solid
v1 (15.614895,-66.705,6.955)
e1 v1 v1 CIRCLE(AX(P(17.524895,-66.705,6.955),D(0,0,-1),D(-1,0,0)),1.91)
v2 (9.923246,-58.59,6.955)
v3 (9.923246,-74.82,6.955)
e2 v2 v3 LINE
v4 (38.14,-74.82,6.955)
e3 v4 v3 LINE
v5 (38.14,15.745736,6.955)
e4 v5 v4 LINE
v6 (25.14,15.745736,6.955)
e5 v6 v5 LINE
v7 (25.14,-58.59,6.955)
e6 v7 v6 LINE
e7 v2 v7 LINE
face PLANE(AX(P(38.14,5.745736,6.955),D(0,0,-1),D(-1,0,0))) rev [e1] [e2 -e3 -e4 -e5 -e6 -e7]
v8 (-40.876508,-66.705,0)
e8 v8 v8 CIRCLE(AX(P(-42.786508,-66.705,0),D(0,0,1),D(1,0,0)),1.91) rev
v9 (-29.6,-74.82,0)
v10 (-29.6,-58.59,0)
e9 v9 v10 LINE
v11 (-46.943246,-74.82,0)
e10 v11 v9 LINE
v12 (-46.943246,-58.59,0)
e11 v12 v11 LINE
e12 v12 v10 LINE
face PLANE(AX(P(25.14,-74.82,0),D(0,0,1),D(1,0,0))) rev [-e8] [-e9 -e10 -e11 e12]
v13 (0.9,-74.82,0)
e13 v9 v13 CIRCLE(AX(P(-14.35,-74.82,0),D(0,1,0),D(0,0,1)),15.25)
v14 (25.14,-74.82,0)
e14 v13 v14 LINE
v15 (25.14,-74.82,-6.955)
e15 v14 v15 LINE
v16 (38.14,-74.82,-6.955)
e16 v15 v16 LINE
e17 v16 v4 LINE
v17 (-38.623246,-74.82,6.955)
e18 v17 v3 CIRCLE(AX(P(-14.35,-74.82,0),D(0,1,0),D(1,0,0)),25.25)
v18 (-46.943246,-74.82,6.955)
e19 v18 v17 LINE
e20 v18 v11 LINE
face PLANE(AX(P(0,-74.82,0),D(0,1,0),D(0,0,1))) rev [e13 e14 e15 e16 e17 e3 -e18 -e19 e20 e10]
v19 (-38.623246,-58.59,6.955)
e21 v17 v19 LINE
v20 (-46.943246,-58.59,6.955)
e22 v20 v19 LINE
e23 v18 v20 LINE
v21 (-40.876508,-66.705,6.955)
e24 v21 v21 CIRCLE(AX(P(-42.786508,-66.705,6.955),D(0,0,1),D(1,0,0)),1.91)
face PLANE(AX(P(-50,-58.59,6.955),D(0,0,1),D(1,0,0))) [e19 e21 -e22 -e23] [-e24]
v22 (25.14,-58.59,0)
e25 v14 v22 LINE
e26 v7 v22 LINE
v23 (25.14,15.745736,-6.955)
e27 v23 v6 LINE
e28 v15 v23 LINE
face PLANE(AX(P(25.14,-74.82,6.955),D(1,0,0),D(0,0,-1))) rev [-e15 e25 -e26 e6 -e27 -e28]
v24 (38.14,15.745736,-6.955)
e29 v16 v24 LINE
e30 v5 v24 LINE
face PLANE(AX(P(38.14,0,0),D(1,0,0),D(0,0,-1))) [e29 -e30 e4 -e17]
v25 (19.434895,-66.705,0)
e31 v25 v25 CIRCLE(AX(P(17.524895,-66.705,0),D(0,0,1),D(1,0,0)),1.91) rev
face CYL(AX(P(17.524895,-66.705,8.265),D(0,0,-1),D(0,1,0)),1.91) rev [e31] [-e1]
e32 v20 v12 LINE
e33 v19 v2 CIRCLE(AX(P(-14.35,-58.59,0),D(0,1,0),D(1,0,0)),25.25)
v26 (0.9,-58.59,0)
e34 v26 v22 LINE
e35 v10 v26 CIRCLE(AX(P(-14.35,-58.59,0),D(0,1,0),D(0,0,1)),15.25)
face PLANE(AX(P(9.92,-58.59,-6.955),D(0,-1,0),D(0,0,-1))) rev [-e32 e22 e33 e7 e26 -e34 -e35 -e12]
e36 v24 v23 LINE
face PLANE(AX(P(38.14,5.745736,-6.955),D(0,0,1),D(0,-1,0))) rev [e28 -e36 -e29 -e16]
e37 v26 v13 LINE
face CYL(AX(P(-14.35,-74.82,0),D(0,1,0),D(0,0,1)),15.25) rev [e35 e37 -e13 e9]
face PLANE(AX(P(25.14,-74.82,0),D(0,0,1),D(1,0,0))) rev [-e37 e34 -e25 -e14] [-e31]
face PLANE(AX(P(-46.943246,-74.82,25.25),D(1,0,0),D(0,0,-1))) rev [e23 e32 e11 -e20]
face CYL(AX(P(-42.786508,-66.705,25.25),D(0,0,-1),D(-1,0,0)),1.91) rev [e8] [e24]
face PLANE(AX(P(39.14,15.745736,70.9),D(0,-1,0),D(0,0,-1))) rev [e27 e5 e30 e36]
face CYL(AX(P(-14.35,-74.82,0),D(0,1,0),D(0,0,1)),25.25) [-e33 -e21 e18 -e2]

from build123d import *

# Parameters (mm, degrees)
SKETCH_1_W                = 50.28
SKETCH_1_H                = 34.2
SKETCH_1_W_2              = 30.28
SKETCH_1_H_2              = 14.2
EXTRUDE_1_DEPTH           = 12.25
SKETCH_4_W                = 13
SKETCH_4_H                = 13.91
EXTRUDE_1_2_DEPTH         = 74.82
SKETCH_5_W                = 13.91
SKETCH_5_H                = 16.23
EXTRUDE_2_DEPTH           = 16
SKETCH_7_R                = 25.25
SKETCH_7_R_2              = 15.25
EXTRUDE_2_2_DEPTH         = 16.23
SKETCH_15_R               = 1.91
CUT_EXTRUDE_6_DEPTH       = 97.964478439
SKETCH_18_W               = 49.344544624
SKETCH_18_H               = 6.125
CUT_EXTRUDE_8_DEPTH       = 101.789238284
SKETCH_19_W               = 34.2
SKETCH_19_H               = 6.125
CUT_EXTRUDE_9_DEPTH       = 10
SKETCH_21_R               = 1.91
CUT_EXTRUDE_10_DEPTH      = 10
SKETCH_20_R               = 1.91
CUT_EXTRUDE_11_DEPTH      = 10
FILLET_START              = -7.1
FILLET_1_DEPTH            = 14.2
FILLET_2_DEPTH            = 14.2
SKETCH_29_W               = 13.91
SKETCH_29_H               = 74.82
EXTRUDE_5_DEPTH           = 10
SKETCH_30_W               = 10
SKETCH_30_H               = 58.59
CUT_EXTRUDE_13_DEPTH      = 97.964478439
SKETCH_32_W               = 34.2
SKETCH_32_H               = 5.745736365
EXTRUDE_6_DEPTH           = 10
CUT_EXTRUDE_16_DEPTH      = 50
CUT_EXTRUDE_16_DEPTH_BACK = 50
SKETCH_38_W               = 116.985630298
SKETCH_38_H               = 80.538350638
SKETCH_41_W               = 13.91
SKETCH_41_H               = 5.745736365
EXTRUDE_7_DEPTH           = 3
SKETCH_42_W               = 13
SKETCH_42_H               = 13.91
EXTRUDE_8_DEPTH           = 74.82
SKETCH_43_W               = 13.91
SKETCH_43_H               = 16.23
EXTRUDE_9_DEPTH           = 15.22
SKETCH_44_R               = 1.91
CUT_EXTRUDE_17_DEPTH      = 15.22
SKETCH_46_R               = 25.25
SKETCH_46_R_2             = 15.25
EXTRUDE_6_2_DEPTH         = 16.23
EXTRUDE_10_DEPTH          = 7.22
EXTRUDE_10_DEPTH_BACK     = 10
SKETCH_47_W               = 13.91
SKETCH_47_H               = 16.23
SKETCH_50_W               = 3.056753925
SKETCH_50_H               = 16.23
CUT_EXTRUDE_18_DEPTH      = 96.578211037
SKETCH_51_R               = 1.91
CUT_EXTRUDE_19_DEPTH      = 95.015226304
SKETCH_52_W               = 92.841945613
SKETCH_52_H               = 30
CUT_EXTRUDE_20_DEPTH      = 84.840694713
CUT_EXTRUDE_22_DEPTH      = 50
CUT_EXTRUDE_22_DEPTH_BACK = 50
SKETCH_53_W               = 63.541345486
SKETCH_53_H               = 14.170740414
SKETCH_54_W               = 10
SKETCH_54_H               = 10.145
CUT_EXTRUDE_23_DEPTH      = 50
SKETCH_55_W               = 13
SKETCH_55_H               = 13.91
EXTRUDE_11_DEPTH          = 10
SKETCH_57_W               = 15
SKETCH_57_H               = 34.2
EXTRUDE_12_DEPTH          = 10
SKETCH_58_W               = 34.2
SKETCH_58_H               = 10
EXTRUDE_13_DEPTH          = 27.85
SKETCH_60_W               = 34.2
SKETCH_60_H               = 10
EXTRUDE_14_DEPTH          = 50.28
SKETCH_62_W               = 30.28
SKETCH_62_H               = 14.2
CUT_EXTRUDE_24_DEPTH      = 50.28
SKETCH_64_R               = 1.91
CUT_EXTRUDE_25_DEPTH      = 10
FILLET_3_R                = 30
SKETCH_71_W               = 129.242048602
SKETCH_71_H               = 16.62743132
CUT_EXTRUDE_26_DEPTH      = 88


with BuildPart() as part:
    # 草圖1 → Extrude 1 (new body)
    with BuildSketch(Plane(origin=(0, 0, 0), x_dir=(1, 0, 0), z_dir=(0, 1, 0))):
        Rectangle(SKETCH_1_W, SKETCH_1_H)
        Rectangle(SKETCH_1_W_2, SKETCH_1_H_2, mode=Mode.SUBTRACT)
    extrude(amount=EXTRUDE_1_DEPTH)

    # 草圖4 → Extrude 1 2 (add)
    with BuildSketch(Plane.XZ):
        with Locations((18.64, 0)):
            Rectangle(SKETCH_4_W, SKETCH_4_H)
    extrude(amount=EXTRUDE_1_2_DEPTH)

    # 草圖5 → Extrude 2 (add)
    with BuildSketch(Plane.ZY.offset(-12.14)):
        with Locations((0, -66.705)):
            Rectangle(SKETCH_5_W, SKETCH_5_H)
    extrude(amount=EXTRUDE_2_DEPTH)

    # 草圖7 → Extrude 2 2 (add)
    with BuildSketch(Plane(origin=(3.626674765, -74.82, 0), x_dir=(1, 0, 0), z_dir=(0, -1, 0))):
        with Locations((-30.978154344, 0)):
            Circle(SKETCH_7_R)
        with Locations((-30.978154344, 0)):
            Circle(SKETCH_7_R_2, mode=Mode.SUBTRACT)
    extrude(amount=-EXTRUDE_2_2_DEPTH)

    # 草圖15 → 除料-伸長6 (cut, through all)
    with BuildSketch(Plane(origin=(0, 0, -6.955), x_dir=(-1, 0, 0), z_dir=(0, 0, -1))):
        with Locations((-4.530883248, -66.705)):
            Circle(SKETCH_15_R)
    extrude(amount=-CUT_EXTRUDE_6_DEPTH, mode=Mode.SUBTRACT)

    # 草圖18 → 除料-伸長8 (cut, through all)
    with BuildSketch(Plane(origin=(0, 0, -17.1), x_dir=(-1, 0, 0), z_dir=(0, 0, -1))):
        with Locations((0.467727688, 9.1875)):
            Rectangle(SKETCH_18_W, SKETCH_18_H)
    extrude(amount=-CUT_EXTRUDE_8_DEPTH, mode=Mode.SUBTRACT)

    # 草圖19 → 除料-伸長9 (cut)
    with BuildSketch(Plane.ZY.offset(-24.204544624)):
        with Locations((0, 9.1875)):
            Rectangle(SKETCH_19_W, SKETCH_19_H)
    extrude(amount=-CUT_EXTRUDE_9_DEPTH, mode=Mode.SUBTRACT)

    # 草圖21 → 除料-伸長10 (cut)
    with BuildSketch(Plane(origin=(0, 6.125, 0), x_dir=(1, 0, 0), z_dir=(0, 1, 0))):
        with Locations(Location((17.69, 0, 0), (0, 0, 270))):
            Circle(SKETCH_21_R)
    extrude(amount=-CUT_EXTRUDE_10_DEPTH, mode=Mode.SUBTRACT)

    # 草圖20 → 除料-伸長11 (cut)
    with BuildSketch(Plane(origin=(0, 6.125, 0), x_dir=(1, 0, 0), z_dir=(0, 1, 0))):
        with Locations(Location((-17.395, 0, 0), (0, 0, 270))):
            Circle(SKETCH_20_R)
    extrude(amount=-CUT_EXTRUDE_11_DEPTH, mode=Mode.SUBTRACT)

    # 圓角1: read off the stored shape, not the designer's step
    # 圓角1 outline → 圓角1 (cut)
    with BuildSketch(Plane.XY.offset(FILLET_START)):
        with BuildLine():
            add(Edge.make_bspline(
                [(-15.14, 0), (-21.974170252, 5.199829476), (-25.14, 5.745736365)],
                knots=[0, 0, 0, 0.664102345, 0.664102345, 0.664102345], degree=2, weights=[1, 2.223777218, 1.822127795]))
            Line((-15.14, 0), (-15.14, 6.125))
            Line((-15.14, 6.125), (-25.14, 6.125))
            Line((-25.14, 6.125), (-25.14, 5.745736365))
        make_face()
    extrude(amount=FILLET_1_DEPTH, mode=Mode.SUBTRACT)

    # 圓角2: read off the stored shape, not the designer's step
    # 圓角2 outline → 圓角2 (cut)
    with BuildSketch(Plane.XY.offset(FILLET_START)):
        with BuildLine():
            Line((15.14, 6.125), (15.14, 0))
            add(Edge.make_bspline(
                [(15.14, 0), (21.974170252, 5.199829476), (25.14, 5.745736365)],
                knots=[0, 0, 0, 0.664102345, 0.664102345, 0.664102345], degree=2, weights=[1, 2.223777218, 1.822127795]))
            Line((25.14, 5.745736365), (25.14, 6.125))
            Line((25.14, 6.125), (15.14, 6.125))
        make_face()
    extrude(amount=FILLET_2_DEPTH, mode=Mode.SUBTRACT)

    # 草圖29 → 填料-伸長5 (add)
    with BuildSketch(Plane(origin=(25.14, 0, 0), x_dir=(0, 0, -1), z_dir=(1, 0, 0))):
        with Locations((0, -37.41)):
            Rectangle(SKETCH_29_W, SKETCH_29_H)
    extrude(amount=EXTRUDE_5_DEPTH)

    # 草圖30 → 除料-伸長13 (cut, through all)
    with BuildSketch(Plane.XY.offset(6.955)):
        with Locations((17.14, -29.295)):
            Rectangle(SKETCH_30_W, SKETCH_30_H)
    extrude(amount=-CUT_EXTRUDE_13_DEPTH, mode=Mode.SUBTRACT)

    # 草圖32 → Extrude 6 (add)
    with BuildSketch(Plane(origin=(25.14, 0, 0), x_dir=(0, 0, -1), z_dir=(1, 0, 0))):
        with Locations((0, 2.872868182)):
            Rectangle(SKETCH_32_W, SKETCH_32_H)
    extrude(amount=EXTRUDE_6_DEPTH)

    # 草圖38 → 除料-伸長16 (cut, two sides: drawn at the far end of the back side and taken through both)
    with BuildSketch(Plane(origin=(0, 0, -6.955), x_dir=(-1, 0, 0), z_dir=(0, 0, -1)).offset(-CUT_EXTRUDE_16_DEPTH_BACK)):
        with Locations((7.268869252, -40.269175319)):
            Rectangle(SKETCH_38_W, SKETCH_38_H)
    extrude(amount=CUT_EXTRUDE_16_DEPTH + CUT_EXTRUDE_16_DEPTH_BACK, mode=Mode.SUBTRACT)

    # 草圖41 → 填料-伸長7 (add)
    with BuildSketch(Plane(origin=(35.14, 0, 0), x_dir=(0, 0, -1), z_dir=(1, 0, 0))):
        with Locations((0, 2.872868182)):
            Rectangle(SKETCH_41_W, SKETCH_41_H)
    extrude(amount=EXTRUDE_7_DEPTH)

    # 草圖42 → 填料-伸長8 (add)
    with BuildSketch(Plane(origin=(0, 0, 0), x_dir=(-1, 0, 0), z_dir=(0, -1, 0))):
        with Locations((-31.64, 0)):
            Rectangle(SKETCH_42_W, SKETCH_42_H)
    extrude(amount=EXTRUDE_8_DEPTH)

    # 草圖43 → 填料-伸長9 (add)
    with BuildSketch(Plane.ZY.offset(-25.14)):
        with Locations((0, -66.705)):
            Rectangle(SKETCH_43_W, SKETCH_43_H)
    extrude(amount=EXTRUDE_9_DEPTH)

    # 草圖44 → 除料-伸長17 (cut)
    with BuildSketch(Plane(origin=(0, 0, -6.955), x_dir=(-1, 0, 0), z_dir=(0, 0, -1))):
        with Locations(Location((-17.524895264, -66.705, 0), (0, 0, 90))):
            Circle(SKETCH_44_R)
    extrude(amount=-CUT_EXTRUDE_17_DEPTH, mode=Mode.SUBTRACT)

    # 草圖46 → Extrude 6 2 (add)
    with BuildSketch(Plane(origin=(0, -58.59, 0), x_dir=(1, 0, 0), z_dir=(0, 1, 0))):
        with Locations((-14.35, 0)):
            Circle(SKETCH_46_R)
        with Locations((-14.35, 0)):
            Circle(SKETCH_46_R_2, mode=Mode.SUBTRACT)
    extrude(amount=-EXTRUDE_6_2_DEPTH)

    # 草圖47 → 填料-伸長10 (add, two sides: drawn at the far end of the back side and taken through both)
    with BuildSketch(Plane(origin=(-40, 0, 0), x_dir=(0, 0, -1), z_dir=(1, 0, 0)).offset(-EXTRUDE_10_DEPTH_BACK)):
        with Locations((0, -66.705)):
            Rectangle(SKETCH_47_W, SKETCH_47_H)
    extrude(amount=EXTRUDE_10_DEPTH + EXTRUDE_10_DEPTH_BACK)

    # 草圖50 → 除料-伸長18 (cut, through all)
    with BuildSketch(Plane(origin=(0, 0, -6.955), x_dir=(-1, 0, 0), z_dir=(0, 0, -1))):
        with Locations((48.471623038, -66.705)):
            Rectangle(SKETCH_50_W, SKETCH_50_H)
    extrude(amount=-CUT_EXTRUDE_18_DEPTH, mode=Mode.SUBTRACT)

    # 草圖51 → 除料-伸長19 (cut, through all)
    with BuildSketch(Plane(origin=(0, 0, -6.955), x_dir=(-1, 0, 0), z_dir=(0, 0, -1))):
        with Locations((42.786508152, -66.705)):
            Circle(SKETCH_51_R)
    extrude(amount=-CUT_EXTRUDE_19_DEPTH, mode=Mode.SUBTRACT)

    # 草圖52 → 除料-伸長20 (cut, through all)
    with BuildSketch(Plane(origin=(0, -58.59, 0), x_dir=(1, 0, 0), z_dir=(0, 1, 0))):
        with Locations((-21.280972807, 15)):
            Rectangle(SKETCH_52_W, SKETCH_52_H)
    extrude(amount=-CUT_EXTRUDE_20_DEPTH, mode=Mode.SUBTRACT)

    # 草圖53 → 除料-伸長22 (cut, two sides: drawn at the far end of the back side and taken through both)
    with BuildSketch(Plane(origin=(0, 0, -6.955), x_dir=(-1, 0, 0), z_dir=(0, 0, -1)).offset(-CUT_EXTRUDE_22_DEPTH_BACK)):
        with Locations((6.630672743, -0.960370207)):
            Rectangle(SKETCH_53_W, SKETCH_53_H)
    extrude(amount=CUT_EXTRUDE_22_DEPTH + CUT_EXTRUDE_22_DEPTH_BACK, mode=Mode.SUBTRACT)

    # 草圖54 → 除料-伸長23 (cut)
    with BuildSketch(Plane(origin=(0, 5.745736365, 0), x_dir=(1, 0, 0), z_dir=(0, 1, 0))):
        with Locations((30.14, -12.0275)):
            Rectangle(SKETCH_54_W, SKETCH_54_H)
        with Locations((30.14, 12.0275)):
            Rectangle(SKETCH_54_W, SKETCH_54_H)
    extrude(amount=-CUT_EXTRUDE_23_DEPTH, mode=Mode.SUBTRACT)

    # 草圖55 → 填料-伸長11 (add)
    with BuildSketch(Plane(origin=(0, 5.745736365, 0), x_dir=(1, 0, 0), z_dir=(0, 1, 0))):
        with Locations((31.64, 0)):
            Rectangle(SKETCH_55_W, SKETCH_55_H)
    extrude(amount=EXTRUDE_11_DEPTH)

    # 草圖57 → 填料-伸長12 (add)
    with BuildSketch(Plane(origin=(0, 15.745736365, 0), x_dir=(1, 0, 0), z_dir=(0, 1, 0))):
        with Locations((31.64, 0)):
            Rectangle(SKETCH_57_W, SKETCH_57_H)
    extrude(amount=EXTRUDE_12_DEPTH)

    # 草圖58 → 填料-伸長13 (add)
    with BuildSketch(Plane.ZY.offset(-24.14)):
        with Locations((0, 20.745736365)):
            Rectangle(SKETCH_58_W, SKETCH_58_H)
    extrude(amount=EXTRUDE_13_DEPTH)

    # 草圖60 → 填料-伸長14 (add)
    with BuildSketch(Plane.ZY.offset(3.71)):
        with Locations((0, 20.745736365)):
            Rectangle(SKETCH_60_W, SKETCH_60_H)
    extrude(amount=EXTRUDE_14_DEPTH)

    # 草圖62 → 除料-伸長24 (cut)
    with BuildSketch(Plane(origin=(0, 25.745736365, 0), x_dir=(1, 0, 0), z_dir=(0, 1, 0))):
        with Locations((-28.85, 0)):
            Rectangle(SKETCH_62_W, SKETCH_62_H)
    extrude(amount=-CUT_EXTRUDE_24_DEPTH, mode=Mode.SUBTRACT)

    # 草圖64 → 除料-伸長25 (cut)
    with BuildSketch(Plane(origin=(0, 25.745736365, 0), x_dir=(1, 0, 0), z_dir=(0, 1, 0))):
        with Locations(Location((-8.71, 0, 0), (0, 0, 270))):
            Circle(SKETCH_64_R)
        with Locations(Location((-48.99, 0, 0), (0, 0, 270))):
            Circle(SKETCH_64_R)
    extrude(amount=-CUT_EXTRUDE_25_DEPTH, mode=Mode.SUBTRACT)

    # 圓角3
    # the kernel refuses this fillet: 30 mm, written as the material it takes off along each edge
    with BuildSketch(Plane(origin=(-43.99, 25.745736365, 7.1), x_dir=(-1, 0, 0), z_dir=(0, 0, -1)), Plane(origin=(-13.71, 25.745736365, -7.1), x_dir=(1, 0, 0), z_dir=(0, 0, 1))) as fillet_3_piece_1:
        with BuildLine():
            CenterArc((22.360679775, -30), FILLET_3_R, 90, 48.189685104)
            Line((0, -10), (0, 0))
            Line((0, 0), (22.360679775, 0))
        make_face()
    extrude(amount=14.2, mode=Mode.SUBTRACT)

    # 草圖71 → 除料-伸長26 (cut)
    with BuildSketch(Plane(origin=(0, 0, -17.1), x_dir=(-1, 0, 0), z_dir=(0, 0, -1))):
        with Locations((25.481024301, 24.059452025)):
            Rectangle(SKETCH_71_W, SKETCH_71_H)
    extrude(amount=-CUT_EXTRUDE_26_DEPTH, mode=Mode.SUBTRACT)


solid = part.part
